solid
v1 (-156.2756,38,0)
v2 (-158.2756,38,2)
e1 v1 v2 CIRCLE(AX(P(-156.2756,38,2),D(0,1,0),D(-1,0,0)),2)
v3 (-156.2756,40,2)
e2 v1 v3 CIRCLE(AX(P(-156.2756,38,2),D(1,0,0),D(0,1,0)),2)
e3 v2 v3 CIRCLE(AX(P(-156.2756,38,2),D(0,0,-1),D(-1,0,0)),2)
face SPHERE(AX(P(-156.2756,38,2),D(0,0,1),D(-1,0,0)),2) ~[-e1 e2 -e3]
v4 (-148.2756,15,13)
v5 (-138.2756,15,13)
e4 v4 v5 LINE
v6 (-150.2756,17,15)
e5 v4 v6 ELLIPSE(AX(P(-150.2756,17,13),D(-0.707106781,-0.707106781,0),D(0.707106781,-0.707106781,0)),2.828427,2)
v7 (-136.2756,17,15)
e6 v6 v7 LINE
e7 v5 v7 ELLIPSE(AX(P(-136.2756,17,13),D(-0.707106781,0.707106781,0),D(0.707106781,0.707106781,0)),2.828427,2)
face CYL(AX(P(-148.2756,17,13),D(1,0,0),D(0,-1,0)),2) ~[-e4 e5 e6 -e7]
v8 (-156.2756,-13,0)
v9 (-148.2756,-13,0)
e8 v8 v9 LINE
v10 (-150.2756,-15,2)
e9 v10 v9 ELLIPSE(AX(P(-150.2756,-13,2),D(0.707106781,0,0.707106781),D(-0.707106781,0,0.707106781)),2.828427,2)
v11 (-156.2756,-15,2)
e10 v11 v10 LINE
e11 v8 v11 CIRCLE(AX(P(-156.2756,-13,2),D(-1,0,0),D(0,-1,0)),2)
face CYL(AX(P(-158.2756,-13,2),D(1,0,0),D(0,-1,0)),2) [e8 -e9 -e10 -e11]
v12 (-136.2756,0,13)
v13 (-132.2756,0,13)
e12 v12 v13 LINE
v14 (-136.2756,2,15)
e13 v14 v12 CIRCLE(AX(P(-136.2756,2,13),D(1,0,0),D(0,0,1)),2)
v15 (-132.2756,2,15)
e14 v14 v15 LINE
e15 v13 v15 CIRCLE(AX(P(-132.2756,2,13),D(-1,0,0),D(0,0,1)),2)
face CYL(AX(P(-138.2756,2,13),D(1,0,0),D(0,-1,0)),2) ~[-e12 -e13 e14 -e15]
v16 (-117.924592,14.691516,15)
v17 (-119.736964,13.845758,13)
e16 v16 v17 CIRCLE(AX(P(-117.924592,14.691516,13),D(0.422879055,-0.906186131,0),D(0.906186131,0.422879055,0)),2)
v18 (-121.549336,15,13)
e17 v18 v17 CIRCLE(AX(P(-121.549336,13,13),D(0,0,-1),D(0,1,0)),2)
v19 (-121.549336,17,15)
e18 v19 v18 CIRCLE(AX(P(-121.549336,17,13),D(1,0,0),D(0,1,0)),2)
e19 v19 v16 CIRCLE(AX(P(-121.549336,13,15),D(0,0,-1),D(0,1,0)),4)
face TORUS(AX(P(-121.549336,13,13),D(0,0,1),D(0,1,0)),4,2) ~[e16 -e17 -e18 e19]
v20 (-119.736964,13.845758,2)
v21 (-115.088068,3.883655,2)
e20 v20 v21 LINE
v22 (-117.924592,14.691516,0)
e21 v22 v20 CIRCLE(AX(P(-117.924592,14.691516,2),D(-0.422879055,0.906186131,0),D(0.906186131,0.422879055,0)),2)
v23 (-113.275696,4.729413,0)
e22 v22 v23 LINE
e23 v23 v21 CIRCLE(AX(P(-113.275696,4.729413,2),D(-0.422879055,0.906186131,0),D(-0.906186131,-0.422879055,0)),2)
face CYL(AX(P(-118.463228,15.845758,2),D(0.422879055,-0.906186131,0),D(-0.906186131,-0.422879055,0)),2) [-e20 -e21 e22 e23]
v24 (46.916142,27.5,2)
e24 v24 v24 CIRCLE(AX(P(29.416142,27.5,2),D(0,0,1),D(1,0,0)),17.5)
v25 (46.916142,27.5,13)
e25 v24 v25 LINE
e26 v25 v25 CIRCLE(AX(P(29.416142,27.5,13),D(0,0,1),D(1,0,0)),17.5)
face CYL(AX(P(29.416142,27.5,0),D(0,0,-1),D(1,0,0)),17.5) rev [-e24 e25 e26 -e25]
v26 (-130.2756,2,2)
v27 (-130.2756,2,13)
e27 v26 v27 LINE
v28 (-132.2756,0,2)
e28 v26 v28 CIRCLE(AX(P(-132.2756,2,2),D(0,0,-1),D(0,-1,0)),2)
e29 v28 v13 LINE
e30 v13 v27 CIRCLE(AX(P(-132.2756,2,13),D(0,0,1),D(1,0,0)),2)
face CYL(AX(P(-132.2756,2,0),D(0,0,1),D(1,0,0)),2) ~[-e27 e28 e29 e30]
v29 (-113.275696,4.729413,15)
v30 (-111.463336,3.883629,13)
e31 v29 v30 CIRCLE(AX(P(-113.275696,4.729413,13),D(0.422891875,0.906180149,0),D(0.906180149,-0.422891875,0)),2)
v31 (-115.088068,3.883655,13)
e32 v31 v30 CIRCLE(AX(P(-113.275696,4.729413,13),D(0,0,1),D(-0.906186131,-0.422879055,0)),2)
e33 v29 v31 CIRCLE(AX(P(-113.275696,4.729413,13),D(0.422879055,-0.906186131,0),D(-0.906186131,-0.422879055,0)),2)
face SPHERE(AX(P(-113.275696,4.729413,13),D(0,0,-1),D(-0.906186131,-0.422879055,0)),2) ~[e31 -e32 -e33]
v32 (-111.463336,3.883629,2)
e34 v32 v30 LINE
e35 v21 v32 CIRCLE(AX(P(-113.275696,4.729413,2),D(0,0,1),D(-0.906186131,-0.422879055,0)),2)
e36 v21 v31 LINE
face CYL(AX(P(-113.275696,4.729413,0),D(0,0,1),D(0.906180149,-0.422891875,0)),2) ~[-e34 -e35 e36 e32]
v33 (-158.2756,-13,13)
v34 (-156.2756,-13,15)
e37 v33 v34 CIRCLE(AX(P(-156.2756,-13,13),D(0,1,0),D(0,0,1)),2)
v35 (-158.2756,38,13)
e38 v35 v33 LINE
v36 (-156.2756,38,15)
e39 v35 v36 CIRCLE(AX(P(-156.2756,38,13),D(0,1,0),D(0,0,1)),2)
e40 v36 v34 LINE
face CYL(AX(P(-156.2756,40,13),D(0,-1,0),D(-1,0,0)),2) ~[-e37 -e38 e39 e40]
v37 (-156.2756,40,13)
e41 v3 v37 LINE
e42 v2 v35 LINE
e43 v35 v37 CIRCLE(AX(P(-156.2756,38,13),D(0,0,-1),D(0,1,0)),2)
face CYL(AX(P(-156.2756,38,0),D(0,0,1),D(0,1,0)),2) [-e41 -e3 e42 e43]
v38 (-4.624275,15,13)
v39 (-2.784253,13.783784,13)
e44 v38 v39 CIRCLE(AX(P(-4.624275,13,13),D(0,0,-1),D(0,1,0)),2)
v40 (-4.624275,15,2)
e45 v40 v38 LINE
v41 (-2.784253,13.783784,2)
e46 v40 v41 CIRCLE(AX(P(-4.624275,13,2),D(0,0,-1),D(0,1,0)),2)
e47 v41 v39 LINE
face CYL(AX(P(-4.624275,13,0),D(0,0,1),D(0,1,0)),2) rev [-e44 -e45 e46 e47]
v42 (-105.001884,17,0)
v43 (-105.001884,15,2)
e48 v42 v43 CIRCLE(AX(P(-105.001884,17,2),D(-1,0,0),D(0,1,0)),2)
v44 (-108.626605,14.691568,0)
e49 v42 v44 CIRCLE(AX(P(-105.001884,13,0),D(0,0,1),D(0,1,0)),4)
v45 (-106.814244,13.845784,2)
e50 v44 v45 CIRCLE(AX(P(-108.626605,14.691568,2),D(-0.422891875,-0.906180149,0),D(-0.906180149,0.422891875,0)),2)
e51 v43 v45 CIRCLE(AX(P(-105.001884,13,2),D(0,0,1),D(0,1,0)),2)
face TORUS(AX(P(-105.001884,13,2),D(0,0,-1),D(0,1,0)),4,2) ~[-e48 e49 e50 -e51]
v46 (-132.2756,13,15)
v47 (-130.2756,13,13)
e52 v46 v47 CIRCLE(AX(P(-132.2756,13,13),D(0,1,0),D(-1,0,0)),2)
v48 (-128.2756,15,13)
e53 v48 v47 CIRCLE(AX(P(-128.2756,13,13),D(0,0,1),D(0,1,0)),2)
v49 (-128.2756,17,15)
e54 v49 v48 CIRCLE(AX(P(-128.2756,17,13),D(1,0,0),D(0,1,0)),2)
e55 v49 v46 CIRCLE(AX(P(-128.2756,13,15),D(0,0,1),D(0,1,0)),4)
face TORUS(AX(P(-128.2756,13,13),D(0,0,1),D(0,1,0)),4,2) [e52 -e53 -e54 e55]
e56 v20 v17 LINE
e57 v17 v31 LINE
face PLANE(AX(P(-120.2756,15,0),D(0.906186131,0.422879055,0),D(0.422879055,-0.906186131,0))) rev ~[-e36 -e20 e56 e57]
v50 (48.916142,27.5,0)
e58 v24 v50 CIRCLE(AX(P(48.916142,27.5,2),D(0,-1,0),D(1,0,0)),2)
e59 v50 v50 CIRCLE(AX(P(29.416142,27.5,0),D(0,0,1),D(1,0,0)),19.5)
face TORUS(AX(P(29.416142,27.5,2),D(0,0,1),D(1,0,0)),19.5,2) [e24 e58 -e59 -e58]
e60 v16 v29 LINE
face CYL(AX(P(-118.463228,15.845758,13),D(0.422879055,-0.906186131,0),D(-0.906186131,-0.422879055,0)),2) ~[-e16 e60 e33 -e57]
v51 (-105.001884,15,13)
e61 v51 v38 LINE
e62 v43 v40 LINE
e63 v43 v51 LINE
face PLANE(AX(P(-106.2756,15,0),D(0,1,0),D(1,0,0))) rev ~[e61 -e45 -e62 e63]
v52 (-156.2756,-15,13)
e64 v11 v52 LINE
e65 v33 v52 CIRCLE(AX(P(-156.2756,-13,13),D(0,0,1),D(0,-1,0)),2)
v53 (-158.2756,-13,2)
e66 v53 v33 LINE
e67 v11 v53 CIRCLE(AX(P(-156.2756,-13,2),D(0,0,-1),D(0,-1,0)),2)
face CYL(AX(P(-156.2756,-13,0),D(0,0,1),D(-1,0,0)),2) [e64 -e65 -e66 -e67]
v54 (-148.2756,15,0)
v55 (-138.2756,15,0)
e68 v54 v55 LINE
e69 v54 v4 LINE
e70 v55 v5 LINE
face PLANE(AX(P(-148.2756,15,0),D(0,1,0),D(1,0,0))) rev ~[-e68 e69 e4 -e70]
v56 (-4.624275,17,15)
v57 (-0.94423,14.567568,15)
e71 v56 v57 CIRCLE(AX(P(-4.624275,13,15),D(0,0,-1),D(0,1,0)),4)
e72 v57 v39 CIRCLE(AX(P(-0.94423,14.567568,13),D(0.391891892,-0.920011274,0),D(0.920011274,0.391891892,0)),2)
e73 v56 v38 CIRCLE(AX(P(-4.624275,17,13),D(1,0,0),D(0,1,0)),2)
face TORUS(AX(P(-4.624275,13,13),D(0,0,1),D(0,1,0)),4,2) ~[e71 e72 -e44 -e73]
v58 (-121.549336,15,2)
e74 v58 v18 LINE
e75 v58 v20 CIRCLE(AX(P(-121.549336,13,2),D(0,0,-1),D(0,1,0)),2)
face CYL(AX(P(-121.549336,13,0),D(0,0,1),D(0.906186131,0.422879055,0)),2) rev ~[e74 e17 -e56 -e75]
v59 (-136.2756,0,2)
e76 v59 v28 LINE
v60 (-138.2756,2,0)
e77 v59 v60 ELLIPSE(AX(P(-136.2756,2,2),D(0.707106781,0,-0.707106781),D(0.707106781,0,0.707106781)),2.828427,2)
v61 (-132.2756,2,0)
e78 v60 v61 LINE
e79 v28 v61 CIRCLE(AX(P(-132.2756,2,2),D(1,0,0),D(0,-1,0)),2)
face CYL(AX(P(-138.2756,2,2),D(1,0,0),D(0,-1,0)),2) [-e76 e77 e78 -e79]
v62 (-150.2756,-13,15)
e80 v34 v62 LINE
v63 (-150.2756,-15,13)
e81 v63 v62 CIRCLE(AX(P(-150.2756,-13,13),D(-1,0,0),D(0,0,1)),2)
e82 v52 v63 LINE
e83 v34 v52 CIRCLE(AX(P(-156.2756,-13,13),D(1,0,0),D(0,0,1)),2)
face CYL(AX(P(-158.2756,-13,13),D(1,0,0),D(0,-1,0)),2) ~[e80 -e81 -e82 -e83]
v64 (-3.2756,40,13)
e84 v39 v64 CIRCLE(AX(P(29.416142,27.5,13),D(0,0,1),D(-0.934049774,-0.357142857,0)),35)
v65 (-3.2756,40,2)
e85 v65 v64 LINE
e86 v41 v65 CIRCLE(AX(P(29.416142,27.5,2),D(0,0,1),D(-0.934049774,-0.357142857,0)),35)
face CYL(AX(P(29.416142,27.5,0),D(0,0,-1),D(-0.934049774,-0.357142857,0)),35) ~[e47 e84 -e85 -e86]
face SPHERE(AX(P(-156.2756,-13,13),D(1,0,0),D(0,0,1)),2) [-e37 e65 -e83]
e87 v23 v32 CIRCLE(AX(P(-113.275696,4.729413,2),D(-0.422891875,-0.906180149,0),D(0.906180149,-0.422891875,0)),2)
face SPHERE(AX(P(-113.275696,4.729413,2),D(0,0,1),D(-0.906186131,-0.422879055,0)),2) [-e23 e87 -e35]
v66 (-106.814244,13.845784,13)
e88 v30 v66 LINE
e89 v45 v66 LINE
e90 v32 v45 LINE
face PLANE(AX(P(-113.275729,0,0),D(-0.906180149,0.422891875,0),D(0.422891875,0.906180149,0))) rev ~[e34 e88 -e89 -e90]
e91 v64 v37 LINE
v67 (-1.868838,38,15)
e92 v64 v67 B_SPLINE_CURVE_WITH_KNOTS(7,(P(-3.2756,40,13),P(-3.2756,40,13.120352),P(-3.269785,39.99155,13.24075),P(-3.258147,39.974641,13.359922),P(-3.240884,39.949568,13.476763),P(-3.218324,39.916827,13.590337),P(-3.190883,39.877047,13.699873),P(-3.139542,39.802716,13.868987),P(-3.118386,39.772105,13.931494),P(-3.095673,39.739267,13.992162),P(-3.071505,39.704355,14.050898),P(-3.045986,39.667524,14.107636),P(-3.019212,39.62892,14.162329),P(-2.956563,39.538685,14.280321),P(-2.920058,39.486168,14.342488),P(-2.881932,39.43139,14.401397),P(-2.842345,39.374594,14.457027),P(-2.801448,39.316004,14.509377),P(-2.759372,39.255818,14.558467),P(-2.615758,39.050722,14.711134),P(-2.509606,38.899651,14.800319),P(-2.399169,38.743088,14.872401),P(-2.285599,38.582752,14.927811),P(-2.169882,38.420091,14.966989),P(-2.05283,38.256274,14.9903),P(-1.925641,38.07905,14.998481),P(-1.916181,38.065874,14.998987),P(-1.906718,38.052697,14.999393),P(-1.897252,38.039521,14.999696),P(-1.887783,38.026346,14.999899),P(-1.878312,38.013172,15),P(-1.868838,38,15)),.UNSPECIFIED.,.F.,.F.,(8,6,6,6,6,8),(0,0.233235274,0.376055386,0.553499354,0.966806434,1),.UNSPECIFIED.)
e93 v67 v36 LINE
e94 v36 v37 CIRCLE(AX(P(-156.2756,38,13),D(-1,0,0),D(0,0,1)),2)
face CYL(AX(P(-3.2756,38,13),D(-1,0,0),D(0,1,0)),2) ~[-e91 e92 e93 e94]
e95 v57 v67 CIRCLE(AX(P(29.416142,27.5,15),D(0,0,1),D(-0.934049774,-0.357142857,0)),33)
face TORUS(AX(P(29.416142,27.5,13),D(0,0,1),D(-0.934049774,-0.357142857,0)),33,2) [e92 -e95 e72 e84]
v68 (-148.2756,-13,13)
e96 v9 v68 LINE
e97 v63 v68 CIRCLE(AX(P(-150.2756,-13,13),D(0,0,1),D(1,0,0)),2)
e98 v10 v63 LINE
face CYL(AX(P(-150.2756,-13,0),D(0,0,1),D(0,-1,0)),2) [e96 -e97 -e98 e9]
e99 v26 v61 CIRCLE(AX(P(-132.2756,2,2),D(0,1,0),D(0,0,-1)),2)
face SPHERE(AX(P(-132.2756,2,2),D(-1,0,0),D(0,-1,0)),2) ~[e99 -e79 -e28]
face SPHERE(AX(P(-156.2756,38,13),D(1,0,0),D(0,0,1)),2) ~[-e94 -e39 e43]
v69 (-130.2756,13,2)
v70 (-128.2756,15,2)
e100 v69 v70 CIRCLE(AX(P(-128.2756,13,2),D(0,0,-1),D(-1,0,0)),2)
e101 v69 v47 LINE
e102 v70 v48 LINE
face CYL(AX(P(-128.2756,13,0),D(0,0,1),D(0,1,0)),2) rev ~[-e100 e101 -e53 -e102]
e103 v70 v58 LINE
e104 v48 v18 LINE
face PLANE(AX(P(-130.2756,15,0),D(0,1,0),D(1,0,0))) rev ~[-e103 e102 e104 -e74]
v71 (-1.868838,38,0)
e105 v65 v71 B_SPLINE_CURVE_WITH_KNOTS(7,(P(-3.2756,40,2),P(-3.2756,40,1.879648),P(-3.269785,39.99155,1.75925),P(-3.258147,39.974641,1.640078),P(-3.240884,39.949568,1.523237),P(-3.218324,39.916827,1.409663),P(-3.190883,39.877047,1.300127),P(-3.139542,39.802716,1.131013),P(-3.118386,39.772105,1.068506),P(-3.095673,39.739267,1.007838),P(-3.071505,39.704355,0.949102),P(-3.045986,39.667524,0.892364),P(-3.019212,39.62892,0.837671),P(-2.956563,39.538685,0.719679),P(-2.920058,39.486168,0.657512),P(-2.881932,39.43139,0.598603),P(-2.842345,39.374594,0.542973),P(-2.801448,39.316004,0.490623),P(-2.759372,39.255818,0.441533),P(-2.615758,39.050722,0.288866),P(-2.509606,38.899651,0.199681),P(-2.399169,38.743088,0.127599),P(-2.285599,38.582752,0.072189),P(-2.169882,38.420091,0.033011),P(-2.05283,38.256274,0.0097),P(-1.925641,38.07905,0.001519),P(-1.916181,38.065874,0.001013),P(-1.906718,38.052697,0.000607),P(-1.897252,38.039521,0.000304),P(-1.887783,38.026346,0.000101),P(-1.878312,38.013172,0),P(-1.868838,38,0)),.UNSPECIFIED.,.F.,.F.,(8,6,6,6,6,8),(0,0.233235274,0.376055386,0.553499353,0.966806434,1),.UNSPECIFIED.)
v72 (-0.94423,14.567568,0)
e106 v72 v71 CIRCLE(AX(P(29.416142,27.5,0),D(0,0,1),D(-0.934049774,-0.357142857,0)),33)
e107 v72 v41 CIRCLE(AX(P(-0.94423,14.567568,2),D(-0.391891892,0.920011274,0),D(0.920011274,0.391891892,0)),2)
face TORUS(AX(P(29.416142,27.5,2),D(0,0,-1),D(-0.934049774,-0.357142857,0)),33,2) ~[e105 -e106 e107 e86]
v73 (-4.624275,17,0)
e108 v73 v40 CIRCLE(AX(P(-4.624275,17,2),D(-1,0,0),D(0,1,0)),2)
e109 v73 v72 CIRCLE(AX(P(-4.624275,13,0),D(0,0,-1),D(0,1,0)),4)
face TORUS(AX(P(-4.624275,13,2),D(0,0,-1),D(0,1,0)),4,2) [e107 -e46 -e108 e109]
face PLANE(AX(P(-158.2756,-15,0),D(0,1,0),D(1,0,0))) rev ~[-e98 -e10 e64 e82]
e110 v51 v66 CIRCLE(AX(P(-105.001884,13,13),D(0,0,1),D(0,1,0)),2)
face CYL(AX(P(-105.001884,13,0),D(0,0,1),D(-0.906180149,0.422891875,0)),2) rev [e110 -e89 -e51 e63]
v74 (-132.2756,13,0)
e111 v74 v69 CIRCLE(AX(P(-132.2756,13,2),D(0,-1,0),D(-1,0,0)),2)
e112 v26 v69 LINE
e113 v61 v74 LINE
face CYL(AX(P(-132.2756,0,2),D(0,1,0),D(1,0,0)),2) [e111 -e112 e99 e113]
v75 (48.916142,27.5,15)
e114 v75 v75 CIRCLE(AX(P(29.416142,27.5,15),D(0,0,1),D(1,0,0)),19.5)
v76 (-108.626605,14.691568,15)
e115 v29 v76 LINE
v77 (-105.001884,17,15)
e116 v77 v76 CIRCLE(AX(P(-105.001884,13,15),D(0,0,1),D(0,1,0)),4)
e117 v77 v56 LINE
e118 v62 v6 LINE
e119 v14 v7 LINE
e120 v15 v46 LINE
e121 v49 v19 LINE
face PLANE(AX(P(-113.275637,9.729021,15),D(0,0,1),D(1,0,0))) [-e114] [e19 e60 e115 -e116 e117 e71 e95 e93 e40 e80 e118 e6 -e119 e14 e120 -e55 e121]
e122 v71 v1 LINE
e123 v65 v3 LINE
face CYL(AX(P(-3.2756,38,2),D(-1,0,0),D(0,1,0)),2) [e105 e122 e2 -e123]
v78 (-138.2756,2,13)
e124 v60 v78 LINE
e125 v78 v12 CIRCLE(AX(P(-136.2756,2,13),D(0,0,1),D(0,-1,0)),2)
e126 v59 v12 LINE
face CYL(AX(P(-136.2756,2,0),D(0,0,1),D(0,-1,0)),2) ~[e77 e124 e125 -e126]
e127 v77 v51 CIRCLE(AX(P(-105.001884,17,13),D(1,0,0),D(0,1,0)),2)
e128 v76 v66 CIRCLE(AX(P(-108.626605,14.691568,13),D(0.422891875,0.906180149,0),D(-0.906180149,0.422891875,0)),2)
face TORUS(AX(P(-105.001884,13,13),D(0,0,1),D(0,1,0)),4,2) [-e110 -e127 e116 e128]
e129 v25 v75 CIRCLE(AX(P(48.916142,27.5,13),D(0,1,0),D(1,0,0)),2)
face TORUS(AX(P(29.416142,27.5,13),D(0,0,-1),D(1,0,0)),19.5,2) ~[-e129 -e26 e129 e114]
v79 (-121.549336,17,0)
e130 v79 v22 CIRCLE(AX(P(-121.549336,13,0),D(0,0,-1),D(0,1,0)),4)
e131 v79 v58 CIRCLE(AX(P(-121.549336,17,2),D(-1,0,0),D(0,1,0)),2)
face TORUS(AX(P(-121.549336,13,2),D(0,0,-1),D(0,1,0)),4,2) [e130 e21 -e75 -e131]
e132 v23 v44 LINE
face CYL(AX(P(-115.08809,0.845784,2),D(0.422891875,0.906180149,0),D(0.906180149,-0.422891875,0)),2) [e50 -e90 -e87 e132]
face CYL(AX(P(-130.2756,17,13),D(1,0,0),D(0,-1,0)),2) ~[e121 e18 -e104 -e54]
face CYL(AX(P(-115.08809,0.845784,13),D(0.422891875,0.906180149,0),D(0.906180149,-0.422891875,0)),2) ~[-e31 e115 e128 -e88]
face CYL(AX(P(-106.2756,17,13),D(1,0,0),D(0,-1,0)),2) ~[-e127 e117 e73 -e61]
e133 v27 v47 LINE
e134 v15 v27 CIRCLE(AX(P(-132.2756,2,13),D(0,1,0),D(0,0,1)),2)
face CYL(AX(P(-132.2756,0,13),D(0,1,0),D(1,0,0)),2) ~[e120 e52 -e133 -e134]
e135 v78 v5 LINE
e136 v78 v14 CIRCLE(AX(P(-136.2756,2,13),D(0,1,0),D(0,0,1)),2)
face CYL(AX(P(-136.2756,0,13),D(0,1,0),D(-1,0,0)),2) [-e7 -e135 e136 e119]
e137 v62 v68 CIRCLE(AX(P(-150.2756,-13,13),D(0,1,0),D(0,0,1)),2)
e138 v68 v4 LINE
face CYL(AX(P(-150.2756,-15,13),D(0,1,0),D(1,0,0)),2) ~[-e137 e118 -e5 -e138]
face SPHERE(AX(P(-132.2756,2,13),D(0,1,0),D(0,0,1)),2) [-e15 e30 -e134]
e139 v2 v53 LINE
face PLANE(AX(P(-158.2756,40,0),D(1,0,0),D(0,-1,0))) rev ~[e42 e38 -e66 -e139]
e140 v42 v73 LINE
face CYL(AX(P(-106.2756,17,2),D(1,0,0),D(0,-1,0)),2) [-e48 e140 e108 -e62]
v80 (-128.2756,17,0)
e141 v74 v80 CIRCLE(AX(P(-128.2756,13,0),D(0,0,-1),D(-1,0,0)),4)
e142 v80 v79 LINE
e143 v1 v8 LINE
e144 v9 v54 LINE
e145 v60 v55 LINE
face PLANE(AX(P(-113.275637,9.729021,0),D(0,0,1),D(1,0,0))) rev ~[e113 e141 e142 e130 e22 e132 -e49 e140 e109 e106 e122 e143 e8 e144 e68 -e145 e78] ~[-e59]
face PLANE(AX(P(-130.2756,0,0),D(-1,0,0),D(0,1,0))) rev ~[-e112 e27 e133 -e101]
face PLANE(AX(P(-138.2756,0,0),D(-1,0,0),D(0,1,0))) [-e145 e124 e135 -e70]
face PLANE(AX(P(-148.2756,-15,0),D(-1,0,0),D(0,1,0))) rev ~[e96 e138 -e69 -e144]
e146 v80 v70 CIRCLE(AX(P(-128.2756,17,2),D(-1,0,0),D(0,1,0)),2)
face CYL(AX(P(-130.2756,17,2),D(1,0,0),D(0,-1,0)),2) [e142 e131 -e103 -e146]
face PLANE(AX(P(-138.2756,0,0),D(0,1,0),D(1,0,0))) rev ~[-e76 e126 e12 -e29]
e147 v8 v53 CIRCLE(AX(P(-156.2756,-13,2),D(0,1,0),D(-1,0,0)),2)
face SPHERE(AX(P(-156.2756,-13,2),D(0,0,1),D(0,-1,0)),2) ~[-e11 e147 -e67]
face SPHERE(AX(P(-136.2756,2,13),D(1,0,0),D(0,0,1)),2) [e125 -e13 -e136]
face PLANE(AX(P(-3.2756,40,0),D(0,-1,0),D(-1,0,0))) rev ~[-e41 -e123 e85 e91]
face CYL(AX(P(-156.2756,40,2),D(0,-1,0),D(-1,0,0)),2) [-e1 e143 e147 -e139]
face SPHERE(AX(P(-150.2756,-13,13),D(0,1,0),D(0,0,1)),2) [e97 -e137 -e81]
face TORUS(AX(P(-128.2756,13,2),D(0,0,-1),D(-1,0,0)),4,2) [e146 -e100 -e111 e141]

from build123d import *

# Parameters (mm, degrees)
F0_W     = 8
F0_H     = 15
F0_W_2   = 10
F0_H_2   = 30
F0_R     = 17.5
F1_DEPTH = 15
F2_R     = 2


with BuildPart() as f1:
    # F0 (on Top) → F1 (new body)
    with BuildSketch(Plane.XY):
        Polygon((-113.2757292581, 0), (-106.275600045, 15), (-120.275600045, 15), align=None)
        with Locations((-134.275600045, 7.5)):
            Rectangle(F0_W, F0_H)
        with Locations((-153.275600045, 0)):
            Rectangle(F0_W_2, F0_H_2)
        with BuildLine():
            Line((-3.275600045, 40), (-158.275600045, 40))
            Line((-158.275600045, 40), (-158.275600045, 15))
            Line((-158.275600045, 15), (-148.275600045, 15))
            Line((-148.275600045, 15), (-138.275600045, 15))
            Line((-138.275600045, 15), (-130.275600045, 15))
            Line((-130.275600045, 15), (-120.275600045, 15))
            Line((-120.275600045, 15), (-106.275600045, 15))
            Line((-106.275600045, 15), (-3.275600045, 15))
            ThreePointArc((-3.275600045, 15), (64.4161420316, 27.5), (-3.275600045, 40))
        make_face()
        with Locations((29.4161420316, 27.5)):
            Circle(F0_R, mode=Mode.SUBTRACT)
    extrude(amount=F1_DEPTH)

    # F2
    f2_edges = [f1.edges().sort_by_distance(p)[0] for p in [
        (-80.7756, 40, 15),
        (-54.7756, 15, 15),
        (-116.775665, 7.5, 15),
        (-109.775665, 7.5, 15),
        (-130.2756, 7.5, 15),
        (-134.2756, 0, 15),
        (-143.2756, 15, 15),
        (-138.2756, 7.5, 15),
        (-148.2756, 0, 15),
        (-153.2756, -15, 15),
        (-158.2756, 12.5, 15),
        (64.416142, 27.5, 15),
        (11.916142, 27.5, 15),
        (-106.2756, 15, 7.5),
        (-3.2756, 15, 7.5),
        (-54.7756, 15, 0),
        (-109.775665, 7.5, 0),
        (-113.275729, 0, 7.5),
        (-116.775665, 7.5, 0),
        (-120.2756, 15, 7.5),
        (-134.2756, 0, 0),
        (-130.2756, 0, 7.5),
        (-138.2756, 0, 7.5),
        (-158.2756, -15, 7.5),
        (-148.2756, -15, 7.5),
        (-153.2756, -15, 0),
        (-158.2756, 40, 7.5),
        (-158.2756, 12.5, 0),
        (-80.7756, 40, 0),
        (64.416142, 27.5, 0),
        (46.916142, 27.5, 7.5),
        (11.916142, 27.5, 0),
        (-125.2756, 15, 0),
        (-130.2756, 15, 7.5),
        (-125.2756, 15, 15),
        (-130.2756, 7.5, 0),
    ]]
    fillet(f2_edges, radius=F2_R)


solid = f1.part
